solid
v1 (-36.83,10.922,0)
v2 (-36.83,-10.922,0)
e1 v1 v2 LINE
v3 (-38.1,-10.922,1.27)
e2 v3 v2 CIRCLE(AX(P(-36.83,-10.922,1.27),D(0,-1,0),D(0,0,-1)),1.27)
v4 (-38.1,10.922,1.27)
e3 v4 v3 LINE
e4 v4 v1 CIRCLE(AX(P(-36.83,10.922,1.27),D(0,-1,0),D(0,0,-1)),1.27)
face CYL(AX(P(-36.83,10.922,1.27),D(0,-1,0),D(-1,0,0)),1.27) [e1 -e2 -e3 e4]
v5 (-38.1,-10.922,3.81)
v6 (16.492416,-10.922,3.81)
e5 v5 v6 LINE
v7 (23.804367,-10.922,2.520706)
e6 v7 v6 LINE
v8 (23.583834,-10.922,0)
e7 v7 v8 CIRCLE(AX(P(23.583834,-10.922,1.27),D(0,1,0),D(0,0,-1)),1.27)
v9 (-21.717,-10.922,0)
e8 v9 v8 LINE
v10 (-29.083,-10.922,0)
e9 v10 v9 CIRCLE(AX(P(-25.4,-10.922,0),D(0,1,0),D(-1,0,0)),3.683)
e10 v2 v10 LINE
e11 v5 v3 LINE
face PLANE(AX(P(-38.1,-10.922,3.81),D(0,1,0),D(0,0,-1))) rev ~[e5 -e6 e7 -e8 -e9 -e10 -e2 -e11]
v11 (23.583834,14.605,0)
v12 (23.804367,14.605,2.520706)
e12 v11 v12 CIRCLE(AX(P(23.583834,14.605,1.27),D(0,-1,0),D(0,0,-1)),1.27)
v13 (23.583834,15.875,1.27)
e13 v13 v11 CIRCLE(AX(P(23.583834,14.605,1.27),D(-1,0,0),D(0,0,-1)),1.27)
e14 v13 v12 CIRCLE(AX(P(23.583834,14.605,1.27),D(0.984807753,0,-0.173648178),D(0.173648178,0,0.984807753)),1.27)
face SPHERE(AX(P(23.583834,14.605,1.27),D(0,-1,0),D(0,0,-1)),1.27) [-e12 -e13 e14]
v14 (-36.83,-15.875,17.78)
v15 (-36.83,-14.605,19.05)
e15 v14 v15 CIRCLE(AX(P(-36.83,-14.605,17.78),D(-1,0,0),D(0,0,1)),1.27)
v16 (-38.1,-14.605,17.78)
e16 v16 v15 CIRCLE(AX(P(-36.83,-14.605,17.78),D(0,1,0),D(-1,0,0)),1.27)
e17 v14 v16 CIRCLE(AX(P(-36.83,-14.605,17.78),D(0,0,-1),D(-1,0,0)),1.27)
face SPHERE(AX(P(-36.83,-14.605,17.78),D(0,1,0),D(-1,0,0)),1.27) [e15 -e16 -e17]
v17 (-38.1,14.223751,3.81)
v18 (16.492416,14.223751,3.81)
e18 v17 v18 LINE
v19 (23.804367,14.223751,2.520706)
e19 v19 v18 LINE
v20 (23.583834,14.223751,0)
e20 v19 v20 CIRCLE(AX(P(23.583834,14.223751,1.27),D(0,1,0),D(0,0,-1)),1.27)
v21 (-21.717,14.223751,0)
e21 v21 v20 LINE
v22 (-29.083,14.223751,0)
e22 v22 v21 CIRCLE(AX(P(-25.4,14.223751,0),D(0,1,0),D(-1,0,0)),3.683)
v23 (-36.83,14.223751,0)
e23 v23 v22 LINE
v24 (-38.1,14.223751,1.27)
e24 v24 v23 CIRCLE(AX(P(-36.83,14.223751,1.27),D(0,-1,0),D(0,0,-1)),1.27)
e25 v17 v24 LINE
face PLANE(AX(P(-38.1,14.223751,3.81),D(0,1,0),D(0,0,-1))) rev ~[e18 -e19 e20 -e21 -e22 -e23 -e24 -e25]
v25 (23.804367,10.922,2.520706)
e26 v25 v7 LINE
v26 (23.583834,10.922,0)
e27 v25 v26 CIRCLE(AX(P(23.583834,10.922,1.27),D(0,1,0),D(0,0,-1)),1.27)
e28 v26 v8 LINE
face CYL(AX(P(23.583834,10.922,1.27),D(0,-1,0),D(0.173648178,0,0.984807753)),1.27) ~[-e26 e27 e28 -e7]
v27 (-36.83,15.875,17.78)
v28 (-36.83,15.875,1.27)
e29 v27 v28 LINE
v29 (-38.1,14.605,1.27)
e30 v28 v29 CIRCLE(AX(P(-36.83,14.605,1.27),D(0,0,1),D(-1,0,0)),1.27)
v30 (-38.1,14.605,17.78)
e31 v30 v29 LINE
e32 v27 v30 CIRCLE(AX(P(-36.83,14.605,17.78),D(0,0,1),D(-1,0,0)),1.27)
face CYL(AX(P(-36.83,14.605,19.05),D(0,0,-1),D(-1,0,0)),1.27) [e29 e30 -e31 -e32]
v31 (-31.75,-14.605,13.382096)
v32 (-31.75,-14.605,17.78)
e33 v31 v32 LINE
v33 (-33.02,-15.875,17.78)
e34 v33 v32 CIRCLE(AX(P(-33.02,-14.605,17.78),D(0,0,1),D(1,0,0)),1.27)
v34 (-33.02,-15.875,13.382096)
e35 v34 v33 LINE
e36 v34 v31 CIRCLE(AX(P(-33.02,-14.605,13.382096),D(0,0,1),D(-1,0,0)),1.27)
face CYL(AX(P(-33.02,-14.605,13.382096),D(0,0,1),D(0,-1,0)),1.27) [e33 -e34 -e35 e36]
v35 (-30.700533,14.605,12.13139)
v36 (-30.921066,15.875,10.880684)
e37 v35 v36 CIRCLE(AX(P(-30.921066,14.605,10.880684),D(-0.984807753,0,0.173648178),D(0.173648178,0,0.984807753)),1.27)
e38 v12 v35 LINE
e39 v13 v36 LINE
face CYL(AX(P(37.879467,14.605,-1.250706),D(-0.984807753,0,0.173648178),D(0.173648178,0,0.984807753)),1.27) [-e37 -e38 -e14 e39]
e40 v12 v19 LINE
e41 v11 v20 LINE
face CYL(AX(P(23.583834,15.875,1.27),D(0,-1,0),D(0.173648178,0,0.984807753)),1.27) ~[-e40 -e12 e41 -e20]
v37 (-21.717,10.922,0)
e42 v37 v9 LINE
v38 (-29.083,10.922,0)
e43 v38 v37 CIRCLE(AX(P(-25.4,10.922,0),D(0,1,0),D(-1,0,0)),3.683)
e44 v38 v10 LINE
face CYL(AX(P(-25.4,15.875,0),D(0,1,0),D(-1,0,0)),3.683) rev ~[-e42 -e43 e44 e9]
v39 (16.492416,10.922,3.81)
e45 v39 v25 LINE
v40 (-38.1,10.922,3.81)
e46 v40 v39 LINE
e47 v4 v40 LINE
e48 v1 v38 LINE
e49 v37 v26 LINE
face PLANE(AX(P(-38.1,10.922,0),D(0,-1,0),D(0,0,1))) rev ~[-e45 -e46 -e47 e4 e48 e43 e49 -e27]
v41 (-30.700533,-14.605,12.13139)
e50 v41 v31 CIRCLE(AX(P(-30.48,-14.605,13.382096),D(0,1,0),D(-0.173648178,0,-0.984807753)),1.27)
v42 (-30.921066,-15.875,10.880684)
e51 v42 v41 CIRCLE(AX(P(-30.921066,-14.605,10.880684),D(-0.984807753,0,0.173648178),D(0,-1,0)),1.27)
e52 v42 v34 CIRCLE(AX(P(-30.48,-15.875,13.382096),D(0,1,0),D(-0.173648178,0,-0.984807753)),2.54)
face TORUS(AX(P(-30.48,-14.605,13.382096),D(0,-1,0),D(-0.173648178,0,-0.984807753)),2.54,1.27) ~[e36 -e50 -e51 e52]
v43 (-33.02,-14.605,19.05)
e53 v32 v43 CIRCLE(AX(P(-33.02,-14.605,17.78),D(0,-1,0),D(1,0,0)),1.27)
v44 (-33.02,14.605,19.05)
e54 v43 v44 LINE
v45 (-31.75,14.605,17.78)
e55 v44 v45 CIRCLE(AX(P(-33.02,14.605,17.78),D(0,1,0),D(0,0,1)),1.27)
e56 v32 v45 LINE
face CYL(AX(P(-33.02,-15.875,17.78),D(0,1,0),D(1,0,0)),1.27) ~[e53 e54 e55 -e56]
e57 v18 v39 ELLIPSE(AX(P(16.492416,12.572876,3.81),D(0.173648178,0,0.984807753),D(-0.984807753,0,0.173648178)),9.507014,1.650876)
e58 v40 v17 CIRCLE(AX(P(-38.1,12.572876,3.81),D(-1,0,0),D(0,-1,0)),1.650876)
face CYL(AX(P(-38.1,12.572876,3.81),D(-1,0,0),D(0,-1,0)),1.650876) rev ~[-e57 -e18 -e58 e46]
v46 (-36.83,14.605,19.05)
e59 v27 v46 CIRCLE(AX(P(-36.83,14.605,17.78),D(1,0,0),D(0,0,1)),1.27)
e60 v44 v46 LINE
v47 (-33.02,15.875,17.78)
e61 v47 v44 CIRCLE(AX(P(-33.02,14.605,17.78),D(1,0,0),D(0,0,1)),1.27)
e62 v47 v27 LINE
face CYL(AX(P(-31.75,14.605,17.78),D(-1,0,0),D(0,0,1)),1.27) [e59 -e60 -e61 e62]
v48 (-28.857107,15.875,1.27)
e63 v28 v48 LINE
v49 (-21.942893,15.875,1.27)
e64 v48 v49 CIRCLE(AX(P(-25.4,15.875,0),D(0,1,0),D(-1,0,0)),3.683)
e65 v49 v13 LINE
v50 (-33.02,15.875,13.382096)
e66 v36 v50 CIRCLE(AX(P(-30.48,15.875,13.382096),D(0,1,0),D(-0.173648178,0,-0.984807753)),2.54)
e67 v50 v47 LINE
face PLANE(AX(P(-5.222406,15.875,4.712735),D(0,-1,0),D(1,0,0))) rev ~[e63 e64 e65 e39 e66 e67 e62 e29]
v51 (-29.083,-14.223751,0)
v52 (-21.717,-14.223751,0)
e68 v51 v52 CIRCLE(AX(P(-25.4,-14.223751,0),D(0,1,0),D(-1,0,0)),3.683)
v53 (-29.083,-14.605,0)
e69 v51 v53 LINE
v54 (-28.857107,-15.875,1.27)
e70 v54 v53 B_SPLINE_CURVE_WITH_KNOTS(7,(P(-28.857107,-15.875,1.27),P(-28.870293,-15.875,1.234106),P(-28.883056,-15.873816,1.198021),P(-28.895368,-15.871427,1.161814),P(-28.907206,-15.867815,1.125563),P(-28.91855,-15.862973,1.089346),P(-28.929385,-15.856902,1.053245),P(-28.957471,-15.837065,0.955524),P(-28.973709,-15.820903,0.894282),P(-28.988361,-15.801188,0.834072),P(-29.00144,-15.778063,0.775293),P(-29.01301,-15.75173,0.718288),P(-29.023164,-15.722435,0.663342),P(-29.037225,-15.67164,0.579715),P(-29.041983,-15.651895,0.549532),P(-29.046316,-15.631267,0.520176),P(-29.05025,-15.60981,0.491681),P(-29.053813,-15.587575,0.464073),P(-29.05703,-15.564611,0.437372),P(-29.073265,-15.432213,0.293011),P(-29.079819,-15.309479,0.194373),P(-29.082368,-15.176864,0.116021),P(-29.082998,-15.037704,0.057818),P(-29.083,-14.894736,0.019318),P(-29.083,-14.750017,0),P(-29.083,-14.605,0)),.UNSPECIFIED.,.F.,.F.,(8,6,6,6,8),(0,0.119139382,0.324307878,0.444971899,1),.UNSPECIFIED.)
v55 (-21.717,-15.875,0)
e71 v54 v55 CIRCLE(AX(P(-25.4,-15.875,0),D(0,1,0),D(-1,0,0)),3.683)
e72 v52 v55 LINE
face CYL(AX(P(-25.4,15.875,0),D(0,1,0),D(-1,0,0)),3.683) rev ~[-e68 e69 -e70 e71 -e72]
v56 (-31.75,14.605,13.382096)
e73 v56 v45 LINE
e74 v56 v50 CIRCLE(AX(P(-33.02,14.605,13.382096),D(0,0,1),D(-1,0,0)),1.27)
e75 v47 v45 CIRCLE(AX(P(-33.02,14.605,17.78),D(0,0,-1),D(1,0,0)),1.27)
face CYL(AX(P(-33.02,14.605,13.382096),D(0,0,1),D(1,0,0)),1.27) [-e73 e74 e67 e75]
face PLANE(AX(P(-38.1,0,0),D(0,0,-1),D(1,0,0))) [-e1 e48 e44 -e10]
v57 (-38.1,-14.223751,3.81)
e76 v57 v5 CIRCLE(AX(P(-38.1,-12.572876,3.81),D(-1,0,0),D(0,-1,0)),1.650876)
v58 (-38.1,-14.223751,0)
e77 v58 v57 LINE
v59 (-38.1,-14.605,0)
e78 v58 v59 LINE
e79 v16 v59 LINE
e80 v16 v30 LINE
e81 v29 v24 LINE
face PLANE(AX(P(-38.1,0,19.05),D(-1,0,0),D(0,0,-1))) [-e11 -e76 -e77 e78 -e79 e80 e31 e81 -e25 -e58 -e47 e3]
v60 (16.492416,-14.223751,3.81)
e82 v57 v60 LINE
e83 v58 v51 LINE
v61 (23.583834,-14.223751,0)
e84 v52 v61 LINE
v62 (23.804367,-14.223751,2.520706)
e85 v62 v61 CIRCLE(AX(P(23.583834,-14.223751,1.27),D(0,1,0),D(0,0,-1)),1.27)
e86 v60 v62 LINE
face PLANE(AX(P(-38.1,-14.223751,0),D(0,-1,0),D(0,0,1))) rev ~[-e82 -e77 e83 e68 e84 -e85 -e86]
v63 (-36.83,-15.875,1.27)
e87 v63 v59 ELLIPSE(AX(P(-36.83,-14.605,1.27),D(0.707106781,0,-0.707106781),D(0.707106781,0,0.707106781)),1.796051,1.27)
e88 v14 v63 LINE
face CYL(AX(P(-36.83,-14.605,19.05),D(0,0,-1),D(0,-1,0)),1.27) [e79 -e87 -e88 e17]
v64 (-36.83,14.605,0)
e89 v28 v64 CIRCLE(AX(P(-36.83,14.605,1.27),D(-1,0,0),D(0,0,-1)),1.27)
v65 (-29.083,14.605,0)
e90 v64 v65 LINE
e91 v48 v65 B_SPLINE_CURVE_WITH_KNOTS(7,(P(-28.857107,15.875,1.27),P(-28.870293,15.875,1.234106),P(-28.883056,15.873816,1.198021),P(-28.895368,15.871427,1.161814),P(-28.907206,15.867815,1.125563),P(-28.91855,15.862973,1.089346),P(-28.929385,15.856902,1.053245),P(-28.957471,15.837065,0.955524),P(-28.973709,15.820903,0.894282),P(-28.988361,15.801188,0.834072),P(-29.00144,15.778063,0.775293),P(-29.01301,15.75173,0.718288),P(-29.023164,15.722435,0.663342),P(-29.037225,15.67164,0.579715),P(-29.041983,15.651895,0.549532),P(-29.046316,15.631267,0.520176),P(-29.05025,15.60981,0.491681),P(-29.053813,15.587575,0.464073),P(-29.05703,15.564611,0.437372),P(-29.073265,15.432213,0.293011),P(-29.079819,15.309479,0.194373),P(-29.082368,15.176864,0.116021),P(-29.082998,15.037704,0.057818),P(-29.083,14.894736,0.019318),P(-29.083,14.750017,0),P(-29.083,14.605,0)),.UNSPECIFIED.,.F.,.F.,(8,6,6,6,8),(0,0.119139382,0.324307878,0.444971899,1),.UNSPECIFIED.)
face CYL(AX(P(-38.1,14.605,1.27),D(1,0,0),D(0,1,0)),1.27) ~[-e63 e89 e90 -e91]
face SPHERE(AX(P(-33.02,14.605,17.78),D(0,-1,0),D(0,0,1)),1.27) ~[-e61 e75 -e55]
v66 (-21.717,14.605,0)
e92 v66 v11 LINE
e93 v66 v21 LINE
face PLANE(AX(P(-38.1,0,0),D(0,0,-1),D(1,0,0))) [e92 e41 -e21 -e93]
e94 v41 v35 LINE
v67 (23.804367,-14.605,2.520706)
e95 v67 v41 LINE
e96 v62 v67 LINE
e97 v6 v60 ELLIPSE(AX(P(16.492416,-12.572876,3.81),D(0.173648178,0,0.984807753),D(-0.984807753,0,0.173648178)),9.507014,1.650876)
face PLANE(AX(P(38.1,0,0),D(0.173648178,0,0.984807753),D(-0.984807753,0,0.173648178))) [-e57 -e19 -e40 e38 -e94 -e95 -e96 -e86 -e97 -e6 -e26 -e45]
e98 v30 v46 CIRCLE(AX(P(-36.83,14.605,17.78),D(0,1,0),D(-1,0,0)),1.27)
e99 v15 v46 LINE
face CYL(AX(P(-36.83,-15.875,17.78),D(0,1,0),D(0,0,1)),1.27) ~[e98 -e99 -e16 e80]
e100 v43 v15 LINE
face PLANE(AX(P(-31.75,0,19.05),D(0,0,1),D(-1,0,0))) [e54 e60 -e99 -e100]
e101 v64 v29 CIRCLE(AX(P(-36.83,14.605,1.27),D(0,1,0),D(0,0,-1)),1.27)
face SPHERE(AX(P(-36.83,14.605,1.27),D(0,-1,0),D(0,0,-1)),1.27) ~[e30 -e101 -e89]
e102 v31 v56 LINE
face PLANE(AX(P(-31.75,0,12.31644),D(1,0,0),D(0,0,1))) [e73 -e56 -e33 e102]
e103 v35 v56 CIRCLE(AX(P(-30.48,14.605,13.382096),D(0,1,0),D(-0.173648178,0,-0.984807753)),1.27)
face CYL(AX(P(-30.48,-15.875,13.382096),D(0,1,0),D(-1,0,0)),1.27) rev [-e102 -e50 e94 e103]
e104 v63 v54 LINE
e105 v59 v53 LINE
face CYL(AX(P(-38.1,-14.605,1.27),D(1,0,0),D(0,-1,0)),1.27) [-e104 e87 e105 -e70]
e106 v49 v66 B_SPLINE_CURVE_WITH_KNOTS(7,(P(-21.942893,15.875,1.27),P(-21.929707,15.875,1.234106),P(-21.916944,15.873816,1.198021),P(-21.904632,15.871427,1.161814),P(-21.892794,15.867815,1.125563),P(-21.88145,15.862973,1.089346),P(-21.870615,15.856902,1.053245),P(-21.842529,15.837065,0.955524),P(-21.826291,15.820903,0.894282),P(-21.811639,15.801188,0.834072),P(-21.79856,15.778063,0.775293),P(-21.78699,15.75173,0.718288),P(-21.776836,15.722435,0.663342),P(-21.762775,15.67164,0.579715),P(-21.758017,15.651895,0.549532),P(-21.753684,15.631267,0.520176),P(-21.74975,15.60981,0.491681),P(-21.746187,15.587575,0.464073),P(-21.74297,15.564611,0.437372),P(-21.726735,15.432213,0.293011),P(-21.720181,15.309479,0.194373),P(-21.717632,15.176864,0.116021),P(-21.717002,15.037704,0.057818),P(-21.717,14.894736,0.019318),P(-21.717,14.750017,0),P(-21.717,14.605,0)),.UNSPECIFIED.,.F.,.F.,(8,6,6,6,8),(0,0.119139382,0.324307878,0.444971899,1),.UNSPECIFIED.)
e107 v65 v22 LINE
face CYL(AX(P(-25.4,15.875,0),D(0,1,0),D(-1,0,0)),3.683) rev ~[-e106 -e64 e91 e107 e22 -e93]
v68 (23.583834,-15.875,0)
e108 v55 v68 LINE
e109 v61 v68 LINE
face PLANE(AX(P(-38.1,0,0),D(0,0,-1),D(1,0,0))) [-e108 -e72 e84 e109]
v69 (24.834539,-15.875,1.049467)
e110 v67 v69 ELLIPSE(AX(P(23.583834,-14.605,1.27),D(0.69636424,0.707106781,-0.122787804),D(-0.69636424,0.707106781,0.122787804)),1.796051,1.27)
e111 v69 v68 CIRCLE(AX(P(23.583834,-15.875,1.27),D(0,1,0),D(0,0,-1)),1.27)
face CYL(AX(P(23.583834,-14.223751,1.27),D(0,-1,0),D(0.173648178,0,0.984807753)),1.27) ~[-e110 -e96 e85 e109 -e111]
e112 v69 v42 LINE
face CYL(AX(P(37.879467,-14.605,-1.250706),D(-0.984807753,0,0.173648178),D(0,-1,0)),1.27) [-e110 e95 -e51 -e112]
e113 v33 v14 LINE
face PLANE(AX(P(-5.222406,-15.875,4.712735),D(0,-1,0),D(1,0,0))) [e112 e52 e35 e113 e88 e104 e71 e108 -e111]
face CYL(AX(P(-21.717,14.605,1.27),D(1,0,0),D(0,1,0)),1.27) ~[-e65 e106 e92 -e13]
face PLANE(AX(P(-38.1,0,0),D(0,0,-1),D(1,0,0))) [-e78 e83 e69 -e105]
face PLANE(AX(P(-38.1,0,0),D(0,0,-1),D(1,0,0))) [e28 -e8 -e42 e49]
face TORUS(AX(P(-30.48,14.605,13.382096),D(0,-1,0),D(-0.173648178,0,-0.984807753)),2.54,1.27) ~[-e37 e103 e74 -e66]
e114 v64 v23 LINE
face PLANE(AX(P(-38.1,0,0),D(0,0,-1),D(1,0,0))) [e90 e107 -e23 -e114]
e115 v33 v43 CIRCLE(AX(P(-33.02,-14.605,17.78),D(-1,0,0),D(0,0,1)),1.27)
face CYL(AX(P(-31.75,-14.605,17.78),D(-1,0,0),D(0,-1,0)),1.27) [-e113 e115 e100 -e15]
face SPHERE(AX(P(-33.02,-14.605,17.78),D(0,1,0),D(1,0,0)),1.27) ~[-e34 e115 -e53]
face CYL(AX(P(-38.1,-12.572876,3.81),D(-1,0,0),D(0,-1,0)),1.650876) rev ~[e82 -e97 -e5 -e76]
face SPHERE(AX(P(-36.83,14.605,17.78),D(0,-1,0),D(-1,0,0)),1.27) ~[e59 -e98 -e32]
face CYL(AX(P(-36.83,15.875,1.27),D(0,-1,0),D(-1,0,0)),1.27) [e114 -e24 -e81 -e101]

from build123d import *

# Parameters (mm, degrees)
F1_DEPTH = 15.875
F3_DEPTH = 76.201
F5_DEPTH = 31.751
F6_F1_R  = 1.27
F6_F2_R  = 1.27


with BuildPart() as f1:
    # F0 (on Front) → F1 (new body, symmetric)
    with BuildSketch(Plane.XZ):
        Polygon((-38.1, 19.05), (-38.1, 0), (38.1, 0), (-31.75, 12.3164396025), (-31.75, 19.05), align=None)
    extrude(amount=F1_DEPTH, both=True)

    # F2 (on face) → F3 (cut, through all)
    with BuildSketch(Plane(origin=(-38.1, 0, 0), x_dir=(0, -1, 0), z_dir=(-1, 0, 0))):
        with BuildLine():
            Line((-10.922, 0), (-10.922, 3.81))
            ThreePointArc((-10.922, 3.81), (-12.5728756711, 5.4608756711), (-14.2237513422, 3.81))
            Line((-14.2237513422, 3.81), (-14.2237513422, 0))
            Line((-14.2237513422, 0), (-10.922, 0))
        make_face()
        with BuildLine():
            Line((14.2237513422, 0), (14.2237513422, 3.81))
            ThreePointArc((14.2237513422, 3.81), (12.5728756711, 5.4608756711), (10.922, 3.81))
            Line((10.922, 3.81), (10.922, 0))
            Line((10.922, 0), (14.2237513422, 0))
        make_face()
    extrude(amount=-F3_DEPTH, mode=Mode.SUBTRACT)

    # F4 (on face) → F5 (cut, through all)
    with BuildSketch(Plane(origin=(0, 15.875, 0), x_dir=(-1, 0, 0), z_dir=(0, 1, 0))):
        with BuildLine():
            ThreePointArc((29.083, 0), (25.4, 3.683), (21.717, 0))
            Line((21.717, 0), (29.083, 0))
        make_face()
    extrude(amount=-F5_DEPTH, mode=Mode.SUBTRACT)

    # F6: fillet of radius 1.27 on 17 edges, made by hand

    # F6_f1
    f6_f1_edges = [f1.edges().sort_by_distance(p)[0] for p in [
        (-31.75, 0, 12.3164396025),
    ]]
    fillet(f6_f1_edges, radius=F6_F1_R)

    # F6_f2
    f6_f2_edges = [f1.edges().sort_by_distance(p)[0] for p in [
        (38.1, 0, 0),
        (38.1, 15.0493756711, 0),
        (38.1, -15.0493756711, 0),
        (-31.75, 0, 19.05),
        (-38.1, 0, 19.05),
        (-38.1, 15.0493756711, 0),
        (-38.1, 0, 0),
        (-33.5915, -15.875, 0),
        (8.1915, 15.875, 0),
        (-33.5915, 15.875, 0),
        (3.6997334072, -15.875, 6.0656951439),
        (-38.1, -15.875, 9.525),
        (-38.1, 15.875, 9.525),
        (-34.925, -15.875, 19.05),
        (-34.925, 15.875, 19.05),
        (3.6997334072, 15.875, 6.0656951439),
        (-31.4528764428, 15.875, 12.5657558698),
        (-31.4528764428, -15.875, 12.5657558698),
    ]]
    fillet(f6_f2_edges, radius=F6_F2_R)


solid = f1.part
